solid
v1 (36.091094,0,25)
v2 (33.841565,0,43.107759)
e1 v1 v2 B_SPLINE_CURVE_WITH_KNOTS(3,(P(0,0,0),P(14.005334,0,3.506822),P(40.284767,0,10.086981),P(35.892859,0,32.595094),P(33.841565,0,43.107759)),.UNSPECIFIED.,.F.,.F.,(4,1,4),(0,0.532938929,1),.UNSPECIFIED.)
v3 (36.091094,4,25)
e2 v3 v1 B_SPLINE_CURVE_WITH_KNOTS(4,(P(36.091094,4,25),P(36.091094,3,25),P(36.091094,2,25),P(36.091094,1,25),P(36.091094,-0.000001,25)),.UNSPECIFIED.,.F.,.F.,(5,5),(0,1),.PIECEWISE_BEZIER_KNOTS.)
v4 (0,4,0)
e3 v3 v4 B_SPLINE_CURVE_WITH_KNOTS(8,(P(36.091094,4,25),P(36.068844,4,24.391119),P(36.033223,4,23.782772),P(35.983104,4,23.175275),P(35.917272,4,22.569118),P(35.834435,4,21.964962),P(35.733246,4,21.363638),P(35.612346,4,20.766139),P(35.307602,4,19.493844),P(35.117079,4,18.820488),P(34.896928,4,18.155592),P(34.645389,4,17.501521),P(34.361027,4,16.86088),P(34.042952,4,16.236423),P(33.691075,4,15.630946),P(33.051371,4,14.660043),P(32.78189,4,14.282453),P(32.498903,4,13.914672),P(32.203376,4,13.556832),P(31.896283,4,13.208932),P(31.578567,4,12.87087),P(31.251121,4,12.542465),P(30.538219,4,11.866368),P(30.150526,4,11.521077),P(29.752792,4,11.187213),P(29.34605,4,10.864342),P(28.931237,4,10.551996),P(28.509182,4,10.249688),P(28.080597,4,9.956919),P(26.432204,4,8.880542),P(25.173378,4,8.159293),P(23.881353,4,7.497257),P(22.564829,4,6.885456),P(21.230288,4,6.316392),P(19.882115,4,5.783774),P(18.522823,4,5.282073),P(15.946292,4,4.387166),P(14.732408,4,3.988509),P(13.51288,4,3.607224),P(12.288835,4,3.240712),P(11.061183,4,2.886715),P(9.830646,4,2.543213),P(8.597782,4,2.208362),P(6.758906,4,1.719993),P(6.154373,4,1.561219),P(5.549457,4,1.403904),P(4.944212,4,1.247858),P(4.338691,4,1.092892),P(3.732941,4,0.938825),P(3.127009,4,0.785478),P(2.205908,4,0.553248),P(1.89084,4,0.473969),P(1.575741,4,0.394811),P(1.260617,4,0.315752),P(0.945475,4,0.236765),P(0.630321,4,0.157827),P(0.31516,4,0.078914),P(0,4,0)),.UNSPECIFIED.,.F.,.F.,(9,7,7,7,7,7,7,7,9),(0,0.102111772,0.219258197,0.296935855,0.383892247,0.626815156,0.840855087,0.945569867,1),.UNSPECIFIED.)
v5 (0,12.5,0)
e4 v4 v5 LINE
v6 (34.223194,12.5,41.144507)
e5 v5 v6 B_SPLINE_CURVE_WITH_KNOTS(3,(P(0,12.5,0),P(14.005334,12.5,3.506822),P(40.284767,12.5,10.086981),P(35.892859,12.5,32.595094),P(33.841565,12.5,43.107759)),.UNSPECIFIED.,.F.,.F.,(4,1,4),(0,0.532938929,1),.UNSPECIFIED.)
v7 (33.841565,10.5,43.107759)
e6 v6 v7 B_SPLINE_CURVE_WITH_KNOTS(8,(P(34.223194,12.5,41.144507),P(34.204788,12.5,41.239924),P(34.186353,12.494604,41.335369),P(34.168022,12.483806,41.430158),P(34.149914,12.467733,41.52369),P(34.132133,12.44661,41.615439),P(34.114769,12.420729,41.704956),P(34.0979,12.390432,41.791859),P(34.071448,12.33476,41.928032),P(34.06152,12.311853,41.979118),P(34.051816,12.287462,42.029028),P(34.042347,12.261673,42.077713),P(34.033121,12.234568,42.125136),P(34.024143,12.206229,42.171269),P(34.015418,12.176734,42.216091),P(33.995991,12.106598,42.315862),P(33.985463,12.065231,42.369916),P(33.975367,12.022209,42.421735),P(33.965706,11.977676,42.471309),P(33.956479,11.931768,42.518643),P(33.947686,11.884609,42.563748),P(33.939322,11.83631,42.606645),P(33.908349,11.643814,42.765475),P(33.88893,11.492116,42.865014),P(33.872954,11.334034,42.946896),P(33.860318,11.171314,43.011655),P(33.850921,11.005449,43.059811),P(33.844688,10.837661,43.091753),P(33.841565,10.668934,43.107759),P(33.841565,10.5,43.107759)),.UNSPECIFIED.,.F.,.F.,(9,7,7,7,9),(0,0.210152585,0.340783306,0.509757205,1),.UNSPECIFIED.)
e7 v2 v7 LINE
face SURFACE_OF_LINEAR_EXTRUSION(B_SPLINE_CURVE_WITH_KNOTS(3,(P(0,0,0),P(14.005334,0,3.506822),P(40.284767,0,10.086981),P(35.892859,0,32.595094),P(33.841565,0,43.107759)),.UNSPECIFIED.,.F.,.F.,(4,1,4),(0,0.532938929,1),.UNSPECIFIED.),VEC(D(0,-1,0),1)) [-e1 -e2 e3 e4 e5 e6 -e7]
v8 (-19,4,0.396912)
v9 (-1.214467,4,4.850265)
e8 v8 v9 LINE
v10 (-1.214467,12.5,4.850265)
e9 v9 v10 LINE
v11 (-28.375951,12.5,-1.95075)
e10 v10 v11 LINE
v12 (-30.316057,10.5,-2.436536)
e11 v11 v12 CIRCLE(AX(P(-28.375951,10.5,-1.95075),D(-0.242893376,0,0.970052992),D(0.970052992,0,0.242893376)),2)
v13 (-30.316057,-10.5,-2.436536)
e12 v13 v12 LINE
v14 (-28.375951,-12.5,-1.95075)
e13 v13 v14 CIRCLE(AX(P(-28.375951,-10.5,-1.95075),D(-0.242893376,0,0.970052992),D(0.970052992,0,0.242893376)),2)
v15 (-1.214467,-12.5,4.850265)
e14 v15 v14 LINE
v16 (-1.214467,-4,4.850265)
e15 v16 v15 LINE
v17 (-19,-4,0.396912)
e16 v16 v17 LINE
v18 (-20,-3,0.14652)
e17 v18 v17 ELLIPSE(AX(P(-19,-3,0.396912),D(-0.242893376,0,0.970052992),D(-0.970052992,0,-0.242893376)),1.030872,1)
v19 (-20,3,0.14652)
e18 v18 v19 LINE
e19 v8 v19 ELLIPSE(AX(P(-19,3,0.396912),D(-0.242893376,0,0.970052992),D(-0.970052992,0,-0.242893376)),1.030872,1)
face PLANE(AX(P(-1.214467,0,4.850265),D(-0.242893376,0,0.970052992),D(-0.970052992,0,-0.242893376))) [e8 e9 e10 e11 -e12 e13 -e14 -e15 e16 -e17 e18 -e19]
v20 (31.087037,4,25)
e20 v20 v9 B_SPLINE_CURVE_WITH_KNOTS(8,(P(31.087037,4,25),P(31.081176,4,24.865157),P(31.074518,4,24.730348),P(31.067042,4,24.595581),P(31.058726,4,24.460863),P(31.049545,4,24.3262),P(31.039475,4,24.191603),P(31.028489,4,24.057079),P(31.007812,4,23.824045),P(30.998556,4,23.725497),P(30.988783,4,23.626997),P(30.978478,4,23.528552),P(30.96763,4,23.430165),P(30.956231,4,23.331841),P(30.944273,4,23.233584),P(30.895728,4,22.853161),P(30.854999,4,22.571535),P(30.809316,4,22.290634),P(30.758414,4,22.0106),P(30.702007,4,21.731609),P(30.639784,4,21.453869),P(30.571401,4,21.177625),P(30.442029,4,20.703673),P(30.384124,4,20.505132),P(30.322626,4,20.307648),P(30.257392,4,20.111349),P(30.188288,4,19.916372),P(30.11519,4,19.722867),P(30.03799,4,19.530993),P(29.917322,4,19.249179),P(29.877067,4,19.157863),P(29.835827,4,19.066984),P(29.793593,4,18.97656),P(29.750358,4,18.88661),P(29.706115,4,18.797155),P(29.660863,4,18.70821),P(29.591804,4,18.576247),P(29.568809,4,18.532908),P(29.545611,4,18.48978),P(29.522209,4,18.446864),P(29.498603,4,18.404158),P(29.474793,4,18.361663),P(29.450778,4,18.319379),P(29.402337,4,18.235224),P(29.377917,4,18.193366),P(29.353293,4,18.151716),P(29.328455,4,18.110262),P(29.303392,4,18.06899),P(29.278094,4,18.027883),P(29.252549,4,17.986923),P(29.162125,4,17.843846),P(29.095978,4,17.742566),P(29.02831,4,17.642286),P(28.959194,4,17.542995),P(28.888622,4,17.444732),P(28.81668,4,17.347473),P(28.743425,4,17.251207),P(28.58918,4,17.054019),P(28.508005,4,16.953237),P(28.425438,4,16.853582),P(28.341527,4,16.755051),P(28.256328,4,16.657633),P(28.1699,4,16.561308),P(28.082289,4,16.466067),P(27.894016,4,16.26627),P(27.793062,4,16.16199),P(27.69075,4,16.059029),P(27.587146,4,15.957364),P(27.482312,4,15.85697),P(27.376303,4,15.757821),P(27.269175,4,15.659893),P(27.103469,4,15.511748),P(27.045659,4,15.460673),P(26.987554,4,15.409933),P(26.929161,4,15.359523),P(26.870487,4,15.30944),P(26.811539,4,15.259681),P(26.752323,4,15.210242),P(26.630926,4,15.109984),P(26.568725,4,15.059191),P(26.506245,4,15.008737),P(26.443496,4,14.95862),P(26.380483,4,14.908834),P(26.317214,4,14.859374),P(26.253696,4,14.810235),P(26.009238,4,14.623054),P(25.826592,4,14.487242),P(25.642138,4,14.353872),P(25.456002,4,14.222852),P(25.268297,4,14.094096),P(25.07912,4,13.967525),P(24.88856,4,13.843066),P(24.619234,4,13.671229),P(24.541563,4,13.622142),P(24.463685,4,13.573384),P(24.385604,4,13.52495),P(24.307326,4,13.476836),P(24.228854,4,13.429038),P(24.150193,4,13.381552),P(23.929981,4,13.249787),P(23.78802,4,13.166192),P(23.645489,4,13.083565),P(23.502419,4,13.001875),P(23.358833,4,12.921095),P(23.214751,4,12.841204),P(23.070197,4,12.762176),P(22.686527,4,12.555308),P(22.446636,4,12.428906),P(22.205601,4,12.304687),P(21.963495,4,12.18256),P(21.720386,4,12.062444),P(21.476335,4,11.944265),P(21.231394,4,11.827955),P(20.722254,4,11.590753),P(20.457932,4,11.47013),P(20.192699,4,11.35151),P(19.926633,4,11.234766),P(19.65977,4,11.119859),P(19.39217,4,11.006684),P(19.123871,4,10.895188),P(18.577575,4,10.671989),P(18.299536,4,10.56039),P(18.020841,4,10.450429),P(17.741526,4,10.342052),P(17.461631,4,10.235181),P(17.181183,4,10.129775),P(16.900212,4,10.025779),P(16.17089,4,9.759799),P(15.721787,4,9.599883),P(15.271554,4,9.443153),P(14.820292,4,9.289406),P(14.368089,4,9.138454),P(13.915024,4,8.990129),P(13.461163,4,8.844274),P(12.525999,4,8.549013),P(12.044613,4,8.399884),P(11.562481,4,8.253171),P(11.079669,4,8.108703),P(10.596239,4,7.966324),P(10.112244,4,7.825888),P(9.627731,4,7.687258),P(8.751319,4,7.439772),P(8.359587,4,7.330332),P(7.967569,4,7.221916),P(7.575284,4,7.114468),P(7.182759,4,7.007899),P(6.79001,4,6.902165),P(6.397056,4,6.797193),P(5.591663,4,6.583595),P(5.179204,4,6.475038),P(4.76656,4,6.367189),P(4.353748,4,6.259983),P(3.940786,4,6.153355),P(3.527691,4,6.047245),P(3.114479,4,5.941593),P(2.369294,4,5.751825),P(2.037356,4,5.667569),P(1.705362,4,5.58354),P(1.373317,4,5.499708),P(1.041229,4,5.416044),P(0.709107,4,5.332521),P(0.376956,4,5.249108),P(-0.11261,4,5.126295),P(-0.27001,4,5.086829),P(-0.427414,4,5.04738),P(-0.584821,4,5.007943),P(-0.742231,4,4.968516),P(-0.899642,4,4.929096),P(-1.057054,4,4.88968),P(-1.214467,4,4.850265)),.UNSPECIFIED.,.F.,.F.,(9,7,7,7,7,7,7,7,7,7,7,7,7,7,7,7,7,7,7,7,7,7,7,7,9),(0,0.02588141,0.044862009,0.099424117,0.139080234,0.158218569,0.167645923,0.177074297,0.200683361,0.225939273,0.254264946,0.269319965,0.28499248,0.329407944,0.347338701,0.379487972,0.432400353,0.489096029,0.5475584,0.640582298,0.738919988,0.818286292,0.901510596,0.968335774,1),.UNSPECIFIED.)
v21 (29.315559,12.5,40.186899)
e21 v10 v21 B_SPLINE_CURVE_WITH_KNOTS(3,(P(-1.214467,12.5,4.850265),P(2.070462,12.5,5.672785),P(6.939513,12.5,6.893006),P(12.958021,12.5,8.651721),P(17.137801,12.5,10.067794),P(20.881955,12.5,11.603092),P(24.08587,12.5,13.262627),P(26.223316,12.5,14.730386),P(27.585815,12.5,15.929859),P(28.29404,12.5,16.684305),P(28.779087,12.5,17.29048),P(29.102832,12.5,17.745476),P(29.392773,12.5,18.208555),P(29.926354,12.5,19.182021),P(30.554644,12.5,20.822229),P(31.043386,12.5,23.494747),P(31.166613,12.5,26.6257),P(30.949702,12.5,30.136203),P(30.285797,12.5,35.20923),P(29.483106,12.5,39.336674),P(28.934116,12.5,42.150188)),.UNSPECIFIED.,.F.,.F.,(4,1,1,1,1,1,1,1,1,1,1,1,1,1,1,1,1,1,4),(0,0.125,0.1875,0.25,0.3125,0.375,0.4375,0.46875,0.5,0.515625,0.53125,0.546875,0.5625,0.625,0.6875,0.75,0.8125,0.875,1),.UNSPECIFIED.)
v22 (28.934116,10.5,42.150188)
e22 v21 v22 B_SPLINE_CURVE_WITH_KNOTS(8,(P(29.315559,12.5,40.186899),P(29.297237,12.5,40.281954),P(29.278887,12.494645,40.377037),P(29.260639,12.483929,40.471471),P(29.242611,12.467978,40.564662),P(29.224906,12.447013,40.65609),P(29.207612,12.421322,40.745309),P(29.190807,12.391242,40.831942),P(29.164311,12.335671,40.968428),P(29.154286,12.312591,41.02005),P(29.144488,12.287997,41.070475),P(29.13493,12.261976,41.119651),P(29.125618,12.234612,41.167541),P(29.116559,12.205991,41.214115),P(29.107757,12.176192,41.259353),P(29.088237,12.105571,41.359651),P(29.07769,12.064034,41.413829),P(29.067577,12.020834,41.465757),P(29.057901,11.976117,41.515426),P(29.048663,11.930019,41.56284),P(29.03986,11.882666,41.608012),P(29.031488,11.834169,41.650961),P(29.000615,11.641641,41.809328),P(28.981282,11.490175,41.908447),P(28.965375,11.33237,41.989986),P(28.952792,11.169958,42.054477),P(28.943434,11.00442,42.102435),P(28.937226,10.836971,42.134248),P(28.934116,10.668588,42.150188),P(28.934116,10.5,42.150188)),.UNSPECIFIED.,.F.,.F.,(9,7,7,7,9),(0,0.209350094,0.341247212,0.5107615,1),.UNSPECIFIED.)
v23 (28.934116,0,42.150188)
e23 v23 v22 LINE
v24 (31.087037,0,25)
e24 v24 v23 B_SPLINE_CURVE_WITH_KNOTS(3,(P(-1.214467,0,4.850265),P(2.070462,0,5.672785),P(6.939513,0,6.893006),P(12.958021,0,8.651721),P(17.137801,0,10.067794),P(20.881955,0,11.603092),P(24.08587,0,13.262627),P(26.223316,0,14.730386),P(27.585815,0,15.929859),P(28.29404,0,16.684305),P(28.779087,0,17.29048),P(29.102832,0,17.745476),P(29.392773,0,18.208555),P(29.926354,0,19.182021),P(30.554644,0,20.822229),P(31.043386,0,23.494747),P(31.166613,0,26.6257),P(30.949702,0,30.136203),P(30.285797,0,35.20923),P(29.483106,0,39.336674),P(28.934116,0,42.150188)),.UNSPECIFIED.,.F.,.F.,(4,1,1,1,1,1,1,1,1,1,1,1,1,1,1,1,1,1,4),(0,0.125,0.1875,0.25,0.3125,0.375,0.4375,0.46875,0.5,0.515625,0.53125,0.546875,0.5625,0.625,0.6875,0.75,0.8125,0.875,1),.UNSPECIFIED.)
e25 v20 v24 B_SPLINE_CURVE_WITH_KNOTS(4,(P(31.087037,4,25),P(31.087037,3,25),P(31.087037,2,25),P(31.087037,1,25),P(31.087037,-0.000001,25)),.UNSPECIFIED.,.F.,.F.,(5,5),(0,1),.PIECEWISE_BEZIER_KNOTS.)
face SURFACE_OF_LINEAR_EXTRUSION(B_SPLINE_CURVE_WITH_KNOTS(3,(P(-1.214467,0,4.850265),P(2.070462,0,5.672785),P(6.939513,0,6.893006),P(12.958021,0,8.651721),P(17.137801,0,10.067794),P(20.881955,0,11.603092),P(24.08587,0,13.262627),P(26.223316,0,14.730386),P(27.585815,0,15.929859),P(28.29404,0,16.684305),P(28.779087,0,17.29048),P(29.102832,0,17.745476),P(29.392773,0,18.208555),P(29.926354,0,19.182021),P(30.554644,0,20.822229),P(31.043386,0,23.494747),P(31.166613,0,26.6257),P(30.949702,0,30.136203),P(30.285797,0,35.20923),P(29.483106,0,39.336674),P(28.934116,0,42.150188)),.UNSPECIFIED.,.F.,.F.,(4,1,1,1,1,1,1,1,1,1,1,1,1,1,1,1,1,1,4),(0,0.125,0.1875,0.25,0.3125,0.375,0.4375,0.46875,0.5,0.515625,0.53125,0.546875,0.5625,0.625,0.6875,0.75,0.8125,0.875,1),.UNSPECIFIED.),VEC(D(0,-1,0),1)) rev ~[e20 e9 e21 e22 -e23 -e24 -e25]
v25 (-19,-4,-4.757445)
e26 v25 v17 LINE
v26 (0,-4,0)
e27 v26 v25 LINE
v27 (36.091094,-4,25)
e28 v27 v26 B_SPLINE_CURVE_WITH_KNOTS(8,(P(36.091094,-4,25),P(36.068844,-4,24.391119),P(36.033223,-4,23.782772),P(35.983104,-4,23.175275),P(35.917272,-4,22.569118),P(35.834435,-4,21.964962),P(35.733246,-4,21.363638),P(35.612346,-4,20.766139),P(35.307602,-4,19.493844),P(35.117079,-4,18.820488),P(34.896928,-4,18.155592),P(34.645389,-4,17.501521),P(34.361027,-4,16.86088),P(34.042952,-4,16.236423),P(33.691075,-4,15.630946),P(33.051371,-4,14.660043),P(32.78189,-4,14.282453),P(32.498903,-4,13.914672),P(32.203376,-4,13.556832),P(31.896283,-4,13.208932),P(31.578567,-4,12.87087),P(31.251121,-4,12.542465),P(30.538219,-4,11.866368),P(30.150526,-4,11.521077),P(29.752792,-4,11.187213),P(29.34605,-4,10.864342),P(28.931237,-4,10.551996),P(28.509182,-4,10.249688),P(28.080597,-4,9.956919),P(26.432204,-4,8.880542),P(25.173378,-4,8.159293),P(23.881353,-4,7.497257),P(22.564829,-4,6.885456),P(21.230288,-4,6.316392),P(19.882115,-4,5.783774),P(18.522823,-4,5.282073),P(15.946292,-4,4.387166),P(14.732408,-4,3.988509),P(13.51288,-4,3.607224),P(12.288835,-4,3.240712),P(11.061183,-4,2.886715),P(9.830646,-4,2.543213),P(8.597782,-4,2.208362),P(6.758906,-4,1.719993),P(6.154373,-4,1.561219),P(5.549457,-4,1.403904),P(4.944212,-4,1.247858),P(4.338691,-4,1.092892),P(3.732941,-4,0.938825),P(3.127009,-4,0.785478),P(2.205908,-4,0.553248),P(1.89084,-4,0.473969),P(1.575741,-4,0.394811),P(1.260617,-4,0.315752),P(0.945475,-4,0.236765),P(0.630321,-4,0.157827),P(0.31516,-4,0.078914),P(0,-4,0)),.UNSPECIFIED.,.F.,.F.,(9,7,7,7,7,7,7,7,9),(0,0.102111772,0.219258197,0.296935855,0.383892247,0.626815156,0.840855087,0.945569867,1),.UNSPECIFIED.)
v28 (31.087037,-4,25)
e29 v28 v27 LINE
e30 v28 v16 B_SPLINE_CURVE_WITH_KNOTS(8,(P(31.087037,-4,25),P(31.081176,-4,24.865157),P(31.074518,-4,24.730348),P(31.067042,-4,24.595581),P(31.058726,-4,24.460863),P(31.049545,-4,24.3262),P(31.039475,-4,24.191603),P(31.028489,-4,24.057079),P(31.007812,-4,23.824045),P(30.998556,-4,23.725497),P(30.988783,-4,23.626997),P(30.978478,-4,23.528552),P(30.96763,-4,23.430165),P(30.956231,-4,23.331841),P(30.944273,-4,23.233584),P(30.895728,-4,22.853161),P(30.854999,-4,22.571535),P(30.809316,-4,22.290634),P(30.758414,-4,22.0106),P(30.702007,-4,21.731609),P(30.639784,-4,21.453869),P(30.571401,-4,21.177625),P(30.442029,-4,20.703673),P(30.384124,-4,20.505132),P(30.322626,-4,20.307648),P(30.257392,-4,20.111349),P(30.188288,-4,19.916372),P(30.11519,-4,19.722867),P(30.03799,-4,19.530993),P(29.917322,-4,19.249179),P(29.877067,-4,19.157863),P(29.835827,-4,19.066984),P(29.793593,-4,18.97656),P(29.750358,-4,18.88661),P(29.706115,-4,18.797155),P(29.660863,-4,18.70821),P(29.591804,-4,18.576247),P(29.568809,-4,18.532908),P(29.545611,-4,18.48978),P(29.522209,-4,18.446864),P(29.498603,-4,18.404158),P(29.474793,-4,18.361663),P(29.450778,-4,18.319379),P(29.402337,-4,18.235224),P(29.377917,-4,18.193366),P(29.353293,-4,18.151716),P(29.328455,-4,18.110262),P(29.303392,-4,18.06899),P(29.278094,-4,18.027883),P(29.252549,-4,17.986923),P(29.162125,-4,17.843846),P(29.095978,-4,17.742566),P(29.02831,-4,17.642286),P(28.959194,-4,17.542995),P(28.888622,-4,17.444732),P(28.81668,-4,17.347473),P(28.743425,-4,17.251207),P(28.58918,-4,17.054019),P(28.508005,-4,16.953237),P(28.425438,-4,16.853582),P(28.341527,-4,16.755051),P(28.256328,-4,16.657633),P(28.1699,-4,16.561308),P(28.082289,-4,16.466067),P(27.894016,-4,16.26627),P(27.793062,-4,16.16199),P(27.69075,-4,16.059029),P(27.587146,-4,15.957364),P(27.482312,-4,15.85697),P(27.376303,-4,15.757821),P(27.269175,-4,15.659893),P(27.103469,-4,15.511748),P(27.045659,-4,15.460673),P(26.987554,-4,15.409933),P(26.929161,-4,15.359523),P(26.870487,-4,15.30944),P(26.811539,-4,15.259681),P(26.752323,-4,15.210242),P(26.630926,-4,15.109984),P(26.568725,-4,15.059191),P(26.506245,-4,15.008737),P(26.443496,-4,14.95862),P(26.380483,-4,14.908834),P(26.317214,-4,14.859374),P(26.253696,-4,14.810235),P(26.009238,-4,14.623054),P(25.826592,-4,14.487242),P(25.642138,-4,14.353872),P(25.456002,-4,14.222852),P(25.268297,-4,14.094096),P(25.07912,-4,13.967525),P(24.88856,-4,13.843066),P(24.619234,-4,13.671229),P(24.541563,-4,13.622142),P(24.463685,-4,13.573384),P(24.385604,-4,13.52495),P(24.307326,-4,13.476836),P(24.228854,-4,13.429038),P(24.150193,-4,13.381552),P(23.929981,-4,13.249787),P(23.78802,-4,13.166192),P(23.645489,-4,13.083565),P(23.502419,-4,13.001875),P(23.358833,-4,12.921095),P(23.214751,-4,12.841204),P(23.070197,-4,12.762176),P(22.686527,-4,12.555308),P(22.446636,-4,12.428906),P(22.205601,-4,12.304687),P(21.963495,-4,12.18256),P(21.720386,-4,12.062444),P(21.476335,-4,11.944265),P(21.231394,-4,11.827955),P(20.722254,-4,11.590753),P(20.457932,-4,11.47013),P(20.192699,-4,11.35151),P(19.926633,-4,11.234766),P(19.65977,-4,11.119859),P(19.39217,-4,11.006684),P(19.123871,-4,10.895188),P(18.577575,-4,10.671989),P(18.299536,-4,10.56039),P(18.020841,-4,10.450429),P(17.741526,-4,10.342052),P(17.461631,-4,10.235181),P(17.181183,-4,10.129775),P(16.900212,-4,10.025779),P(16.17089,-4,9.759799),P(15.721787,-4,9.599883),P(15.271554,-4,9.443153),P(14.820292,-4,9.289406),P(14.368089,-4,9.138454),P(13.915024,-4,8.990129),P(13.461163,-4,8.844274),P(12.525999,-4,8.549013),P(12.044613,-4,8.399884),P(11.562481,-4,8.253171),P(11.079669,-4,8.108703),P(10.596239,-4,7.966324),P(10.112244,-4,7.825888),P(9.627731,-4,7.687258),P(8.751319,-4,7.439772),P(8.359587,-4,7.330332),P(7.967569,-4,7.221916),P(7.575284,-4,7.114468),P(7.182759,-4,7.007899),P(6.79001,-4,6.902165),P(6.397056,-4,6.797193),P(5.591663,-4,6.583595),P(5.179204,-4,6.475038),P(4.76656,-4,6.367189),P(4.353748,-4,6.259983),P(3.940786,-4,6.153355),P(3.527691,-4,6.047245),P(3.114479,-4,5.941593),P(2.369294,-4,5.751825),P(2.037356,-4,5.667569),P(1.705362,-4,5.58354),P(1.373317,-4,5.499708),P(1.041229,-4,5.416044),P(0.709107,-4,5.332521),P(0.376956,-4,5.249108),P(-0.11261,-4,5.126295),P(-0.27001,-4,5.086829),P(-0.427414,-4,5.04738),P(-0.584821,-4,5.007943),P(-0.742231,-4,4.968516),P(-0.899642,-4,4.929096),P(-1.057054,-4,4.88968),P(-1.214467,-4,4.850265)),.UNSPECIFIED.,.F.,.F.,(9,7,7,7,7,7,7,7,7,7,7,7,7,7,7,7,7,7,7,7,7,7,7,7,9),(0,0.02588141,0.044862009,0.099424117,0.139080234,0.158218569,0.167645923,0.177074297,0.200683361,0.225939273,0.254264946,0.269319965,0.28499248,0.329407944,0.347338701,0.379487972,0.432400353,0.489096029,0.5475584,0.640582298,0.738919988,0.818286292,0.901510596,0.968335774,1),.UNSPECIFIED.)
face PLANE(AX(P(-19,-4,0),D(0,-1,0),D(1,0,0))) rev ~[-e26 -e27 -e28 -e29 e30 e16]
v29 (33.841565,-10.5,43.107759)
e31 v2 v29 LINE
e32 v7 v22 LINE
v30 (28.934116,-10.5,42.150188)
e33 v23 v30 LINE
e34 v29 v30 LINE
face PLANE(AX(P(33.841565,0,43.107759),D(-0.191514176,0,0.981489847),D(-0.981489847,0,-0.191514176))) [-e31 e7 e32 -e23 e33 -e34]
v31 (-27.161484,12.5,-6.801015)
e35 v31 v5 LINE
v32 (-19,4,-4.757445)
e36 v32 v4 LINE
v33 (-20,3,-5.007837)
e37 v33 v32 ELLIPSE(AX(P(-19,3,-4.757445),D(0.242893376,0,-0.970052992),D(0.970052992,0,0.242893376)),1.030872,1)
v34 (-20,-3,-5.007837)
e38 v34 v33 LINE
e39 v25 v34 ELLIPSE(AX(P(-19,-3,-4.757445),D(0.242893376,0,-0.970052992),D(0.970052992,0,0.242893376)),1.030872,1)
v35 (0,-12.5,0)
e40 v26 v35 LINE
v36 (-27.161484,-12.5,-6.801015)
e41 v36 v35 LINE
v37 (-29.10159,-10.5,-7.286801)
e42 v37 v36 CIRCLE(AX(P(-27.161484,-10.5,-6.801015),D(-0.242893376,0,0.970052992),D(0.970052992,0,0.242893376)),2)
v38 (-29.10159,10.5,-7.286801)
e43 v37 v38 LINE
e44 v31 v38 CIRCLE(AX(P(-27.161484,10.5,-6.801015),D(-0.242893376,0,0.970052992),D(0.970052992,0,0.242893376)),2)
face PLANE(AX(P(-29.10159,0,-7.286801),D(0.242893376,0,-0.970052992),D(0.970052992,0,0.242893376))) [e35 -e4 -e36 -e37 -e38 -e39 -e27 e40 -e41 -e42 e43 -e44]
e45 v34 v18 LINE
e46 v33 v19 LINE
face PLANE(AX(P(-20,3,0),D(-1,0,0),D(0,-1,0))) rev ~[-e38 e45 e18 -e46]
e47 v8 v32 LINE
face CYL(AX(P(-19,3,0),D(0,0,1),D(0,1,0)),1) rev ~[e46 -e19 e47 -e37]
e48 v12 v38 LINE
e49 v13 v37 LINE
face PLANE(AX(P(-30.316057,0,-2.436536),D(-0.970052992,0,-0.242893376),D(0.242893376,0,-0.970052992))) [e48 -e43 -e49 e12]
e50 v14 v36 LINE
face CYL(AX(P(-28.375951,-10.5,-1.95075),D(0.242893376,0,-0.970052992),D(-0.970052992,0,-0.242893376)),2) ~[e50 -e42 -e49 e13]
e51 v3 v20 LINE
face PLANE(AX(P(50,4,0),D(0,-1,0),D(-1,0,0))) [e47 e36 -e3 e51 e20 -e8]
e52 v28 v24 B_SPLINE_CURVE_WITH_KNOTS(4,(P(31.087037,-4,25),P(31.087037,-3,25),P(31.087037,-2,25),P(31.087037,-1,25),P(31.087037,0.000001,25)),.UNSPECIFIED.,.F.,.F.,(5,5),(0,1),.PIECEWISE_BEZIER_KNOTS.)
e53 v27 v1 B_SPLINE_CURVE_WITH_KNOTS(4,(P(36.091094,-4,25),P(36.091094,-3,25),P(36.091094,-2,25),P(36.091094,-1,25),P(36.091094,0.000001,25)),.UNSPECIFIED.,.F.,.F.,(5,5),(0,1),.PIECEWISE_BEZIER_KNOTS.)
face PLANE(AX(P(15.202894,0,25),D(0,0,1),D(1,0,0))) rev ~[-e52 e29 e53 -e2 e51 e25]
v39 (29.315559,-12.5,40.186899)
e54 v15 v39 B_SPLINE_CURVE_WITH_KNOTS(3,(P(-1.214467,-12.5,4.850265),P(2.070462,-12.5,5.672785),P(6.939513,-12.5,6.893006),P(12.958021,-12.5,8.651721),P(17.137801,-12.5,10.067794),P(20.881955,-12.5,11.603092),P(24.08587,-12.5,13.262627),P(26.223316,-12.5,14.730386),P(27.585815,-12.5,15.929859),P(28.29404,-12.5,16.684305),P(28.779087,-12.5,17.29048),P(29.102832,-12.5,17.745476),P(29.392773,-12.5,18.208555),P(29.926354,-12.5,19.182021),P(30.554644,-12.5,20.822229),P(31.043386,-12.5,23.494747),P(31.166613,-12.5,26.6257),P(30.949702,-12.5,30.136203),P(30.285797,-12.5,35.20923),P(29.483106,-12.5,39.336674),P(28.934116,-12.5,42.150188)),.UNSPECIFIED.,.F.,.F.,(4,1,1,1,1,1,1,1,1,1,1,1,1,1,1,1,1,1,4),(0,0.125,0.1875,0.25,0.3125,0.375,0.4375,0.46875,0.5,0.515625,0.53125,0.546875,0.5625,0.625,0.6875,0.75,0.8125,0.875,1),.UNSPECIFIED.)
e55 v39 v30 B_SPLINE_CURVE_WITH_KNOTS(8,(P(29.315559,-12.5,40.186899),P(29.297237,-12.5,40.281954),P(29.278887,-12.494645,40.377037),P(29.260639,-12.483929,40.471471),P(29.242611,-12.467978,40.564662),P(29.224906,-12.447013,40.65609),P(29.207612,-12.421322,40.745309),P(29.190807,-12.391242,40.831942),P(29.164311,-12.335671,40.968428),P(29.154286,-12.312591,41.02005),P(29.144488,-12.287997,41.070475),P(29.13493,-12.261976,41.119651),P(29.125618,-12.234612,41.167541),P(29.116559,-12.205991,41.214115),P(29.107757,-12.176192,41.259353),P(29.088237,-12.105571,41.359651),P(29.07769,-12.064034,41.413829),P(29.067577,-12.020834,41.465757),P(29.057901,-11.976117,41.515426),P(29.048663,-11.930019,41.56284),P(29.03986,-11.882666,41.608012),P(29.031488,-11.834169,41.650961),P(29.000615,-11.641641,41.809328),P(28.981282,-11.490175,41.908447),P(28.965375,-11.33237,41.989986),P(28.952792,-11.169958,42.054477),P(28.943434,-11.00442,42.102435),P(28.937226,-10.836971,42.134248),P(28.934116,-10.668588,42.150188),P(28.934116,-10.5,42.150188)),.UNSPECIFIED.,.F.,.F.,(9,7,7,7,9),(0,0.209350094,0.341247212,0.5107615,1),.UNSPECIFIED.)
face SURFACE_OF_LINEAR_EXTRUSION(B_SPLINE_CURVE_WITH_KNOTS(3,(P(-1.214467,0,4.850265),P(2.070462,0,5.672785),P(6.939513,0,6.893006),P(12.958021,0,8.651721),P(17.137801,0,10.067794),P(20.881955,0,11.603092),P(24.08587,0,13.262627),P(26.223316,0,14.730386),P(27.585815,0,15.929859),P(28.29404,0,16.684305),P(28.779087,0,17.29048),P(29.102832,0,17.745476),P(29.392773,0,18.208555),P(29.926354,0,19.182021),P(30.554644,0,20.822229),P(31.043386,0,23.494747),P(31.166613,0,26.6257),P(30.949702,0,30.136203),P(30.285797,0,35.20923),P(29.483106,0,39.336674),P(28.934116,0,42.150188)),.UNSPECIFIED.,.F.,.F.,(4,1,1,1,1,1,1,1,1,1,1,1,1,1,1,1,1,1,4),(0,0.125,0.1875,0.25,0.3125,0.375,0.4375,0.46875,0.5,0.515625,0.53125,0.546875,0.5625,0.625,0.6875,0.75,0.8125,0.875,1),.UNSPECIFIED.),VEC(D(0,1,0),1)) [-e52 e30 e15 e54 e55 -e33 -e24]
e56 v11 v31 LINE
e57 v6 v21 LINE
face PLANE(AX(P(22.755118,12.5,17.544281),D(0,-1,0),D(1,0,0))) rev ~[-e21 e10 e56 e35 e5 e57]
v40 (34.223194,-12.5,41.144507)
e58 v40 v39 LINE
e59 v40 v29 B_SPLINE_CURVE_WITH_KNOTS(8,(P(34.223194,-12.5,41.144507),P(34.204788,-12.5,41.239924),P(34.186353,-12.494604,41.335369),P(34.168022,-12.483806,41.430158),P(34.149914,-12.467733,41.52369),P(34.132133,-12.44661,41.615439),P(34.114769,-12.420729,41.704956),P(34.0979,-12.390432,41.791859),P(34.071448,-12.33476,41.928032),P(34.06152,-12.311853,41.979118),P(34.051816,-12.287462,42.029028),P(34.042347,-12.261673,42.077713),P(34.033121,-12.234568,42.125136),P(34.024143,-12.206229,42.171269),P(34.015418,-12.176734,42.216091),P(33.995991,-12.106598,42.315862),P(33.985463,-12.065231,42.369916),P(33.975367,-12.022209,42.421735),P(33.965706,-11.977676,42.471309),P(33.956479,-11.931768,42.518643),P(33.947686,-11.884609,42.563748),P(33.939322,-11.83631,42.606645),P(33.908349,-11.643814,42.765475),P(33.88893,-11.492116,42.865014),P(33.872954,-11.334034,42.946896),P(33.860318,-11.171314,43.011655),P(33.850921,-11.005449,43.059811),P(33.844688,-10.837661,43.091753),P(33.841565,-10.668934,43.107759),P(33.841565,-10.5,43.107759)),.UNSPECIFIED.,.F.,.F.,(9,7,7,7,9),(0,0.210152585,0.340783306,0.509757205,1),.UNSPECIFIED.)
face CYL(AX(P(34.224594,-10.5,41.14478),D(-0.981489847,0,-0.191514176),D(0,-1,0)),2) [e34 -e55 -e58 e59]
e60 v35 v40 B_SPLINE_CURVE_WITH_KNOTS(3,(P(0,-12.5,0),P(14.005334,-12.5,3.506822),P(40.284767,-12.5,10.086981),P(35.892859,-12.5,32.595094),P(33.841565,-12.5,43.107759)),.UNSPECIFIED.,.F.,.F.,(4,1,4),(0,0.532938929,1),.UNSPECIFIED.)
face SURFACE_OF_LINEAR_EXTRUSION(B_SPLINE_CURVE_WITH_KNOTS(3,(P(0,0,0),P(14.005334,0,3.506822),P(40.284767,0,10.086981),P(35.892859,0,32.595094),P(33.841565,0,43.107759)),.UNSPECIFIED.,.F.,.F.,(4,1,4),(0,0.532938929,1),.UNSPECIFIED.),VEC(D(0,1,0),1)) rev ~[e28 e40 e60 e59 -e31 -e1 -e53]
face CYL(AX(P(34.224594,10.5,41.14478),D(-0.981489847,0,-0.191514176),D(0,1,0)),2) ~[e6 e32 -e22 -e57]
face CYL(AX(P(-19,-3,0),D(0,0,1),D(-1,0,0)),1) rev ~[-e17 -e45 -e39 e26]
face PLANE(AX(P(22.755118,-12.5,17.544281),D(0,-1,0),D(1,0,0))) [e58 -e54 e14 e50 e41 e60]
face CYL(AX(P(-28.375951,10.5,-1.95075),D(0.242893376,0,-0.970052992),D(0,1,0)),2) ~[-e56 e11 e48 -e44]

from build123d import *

# Parameters (mm, degrees)
F1_DEPTH      = 12.5
F1_DEPTH_BACK = 12.5
F2_R          = 2
F4_DEPTH      = 25
F4_DEPTH_BACK = 25


# Not quite as in the source:
# - the dataset's text gives a spline's control points without its knots; the knots are read off the source's solid


with BuildPart() as f1:
    # F0 (on Front) → F1 (new body, two sides)
    with BuildSketch(Plane.XZ) as f1_sk:
        with BuildLine():
            Line((-1.2144668808, 4.8502649614), (0, 0))
            add(Edge.make_bspline(
                [(0, 0), (14.0053337055, 3.5068216017), (40.2847665376, 10.0869812236), (35.8928594477, 32.5950939434), (33.8415652514, 43.1077592075)],
                knots=[0, 0, 0, 0, 0.5329389288, 1, 1, 1, 1], degree=3))
            Line((33.8415652514, 43.1077592075), (28.9341160149, 42.1501883266))
            add(Edge.make_bspline(
                [(-1.2144668808, 4.8502649614), (2.0704623451, 5.6727845108), (6.9395130075, 6.8930060669), (12.9580209, 8.6517206422), (17.1378010676, 10.0677938672), (20.8819548221, 11.6030918314), (24.0858702772, 13.2626270815), (26.223316492, 14.7303860036), (27.5858152583, 15.9298585553), (28.2940402512, 16.6843045519), (28.7790865507, 17.2904800643), (29.1028323995, 17.7454757687), (29.3927734629, 18.2085550663), (29.9263537911, 19.1820206107), (30.5546444399, 20.8222293139), (31.0433856174, 23.4947469816), (31.1666131935, 26.6257001867), (30.9497019112, 30.1362027001), (30.2857972333, 35.2092298808), (29.4831057596, 39.3366740929), (28.9341160149, 42.1501883266)],
                knots=[0, 0, 0, 0, 0.125, 0.1875, 0.25, 0.3125, 0.375, 0.4375, 0.46875, 0.5, 0.515625, 0.53125, 0.546875, 0.5625, 0.625, 0.6875, 0.75, 0.8125, 0.875, 1, 1, 1, 1], degree=3))
        make_face()
        Polygon((-29.1015897681, -7.286801285), (0, 0), (-1.2144668808, 4.8502649614), (-30.316056649, -2.4365363237), align=None)
    extrude(amount=F1_DEPTH)
    extrude(f1_sk.sketch, amount=-F1_DEPTH_BACK)

    # F2
    f2_edges = [f1.edges().sort_by_distance(p)[0] for p in [
        (31.387841, -12.5, 42.628974),
        (31.387841, 12.5, 42.628974),
        (-29.708823, -12.5, -4.861669),
        (-29.708823, 12.5, -4.861669),
    ]]
    fillet(f2_edges, radius=F2_R)

    # F3 (on Top) → F4 (cut, two sides)
    with BuildSketch(Plane.XY) as f4_sk:
        with BuildLine():
            Line((-19, -4), (50, -4))
            Line((50, -4), (50, 4))
            Line((50, 4), (-19, 4))
            ThreePointArc((-19, 4), (-19.7071067812, 3.7071067812), (-20, 3))
            Line((-20, 3), (-20, -3))
            ThreePointArc((-20, -3), (-19.7071067812, -3.7071067812), (-19, -4))
        make_face()
    extrude(amount=F4_DEPTH, mode=Mode.SUBTRACT)
    extrude(f4_sk.sketch, amount=-F4_DEPTH_BACK, mode=Mode.SUBTRACT)


solid = f1.part
